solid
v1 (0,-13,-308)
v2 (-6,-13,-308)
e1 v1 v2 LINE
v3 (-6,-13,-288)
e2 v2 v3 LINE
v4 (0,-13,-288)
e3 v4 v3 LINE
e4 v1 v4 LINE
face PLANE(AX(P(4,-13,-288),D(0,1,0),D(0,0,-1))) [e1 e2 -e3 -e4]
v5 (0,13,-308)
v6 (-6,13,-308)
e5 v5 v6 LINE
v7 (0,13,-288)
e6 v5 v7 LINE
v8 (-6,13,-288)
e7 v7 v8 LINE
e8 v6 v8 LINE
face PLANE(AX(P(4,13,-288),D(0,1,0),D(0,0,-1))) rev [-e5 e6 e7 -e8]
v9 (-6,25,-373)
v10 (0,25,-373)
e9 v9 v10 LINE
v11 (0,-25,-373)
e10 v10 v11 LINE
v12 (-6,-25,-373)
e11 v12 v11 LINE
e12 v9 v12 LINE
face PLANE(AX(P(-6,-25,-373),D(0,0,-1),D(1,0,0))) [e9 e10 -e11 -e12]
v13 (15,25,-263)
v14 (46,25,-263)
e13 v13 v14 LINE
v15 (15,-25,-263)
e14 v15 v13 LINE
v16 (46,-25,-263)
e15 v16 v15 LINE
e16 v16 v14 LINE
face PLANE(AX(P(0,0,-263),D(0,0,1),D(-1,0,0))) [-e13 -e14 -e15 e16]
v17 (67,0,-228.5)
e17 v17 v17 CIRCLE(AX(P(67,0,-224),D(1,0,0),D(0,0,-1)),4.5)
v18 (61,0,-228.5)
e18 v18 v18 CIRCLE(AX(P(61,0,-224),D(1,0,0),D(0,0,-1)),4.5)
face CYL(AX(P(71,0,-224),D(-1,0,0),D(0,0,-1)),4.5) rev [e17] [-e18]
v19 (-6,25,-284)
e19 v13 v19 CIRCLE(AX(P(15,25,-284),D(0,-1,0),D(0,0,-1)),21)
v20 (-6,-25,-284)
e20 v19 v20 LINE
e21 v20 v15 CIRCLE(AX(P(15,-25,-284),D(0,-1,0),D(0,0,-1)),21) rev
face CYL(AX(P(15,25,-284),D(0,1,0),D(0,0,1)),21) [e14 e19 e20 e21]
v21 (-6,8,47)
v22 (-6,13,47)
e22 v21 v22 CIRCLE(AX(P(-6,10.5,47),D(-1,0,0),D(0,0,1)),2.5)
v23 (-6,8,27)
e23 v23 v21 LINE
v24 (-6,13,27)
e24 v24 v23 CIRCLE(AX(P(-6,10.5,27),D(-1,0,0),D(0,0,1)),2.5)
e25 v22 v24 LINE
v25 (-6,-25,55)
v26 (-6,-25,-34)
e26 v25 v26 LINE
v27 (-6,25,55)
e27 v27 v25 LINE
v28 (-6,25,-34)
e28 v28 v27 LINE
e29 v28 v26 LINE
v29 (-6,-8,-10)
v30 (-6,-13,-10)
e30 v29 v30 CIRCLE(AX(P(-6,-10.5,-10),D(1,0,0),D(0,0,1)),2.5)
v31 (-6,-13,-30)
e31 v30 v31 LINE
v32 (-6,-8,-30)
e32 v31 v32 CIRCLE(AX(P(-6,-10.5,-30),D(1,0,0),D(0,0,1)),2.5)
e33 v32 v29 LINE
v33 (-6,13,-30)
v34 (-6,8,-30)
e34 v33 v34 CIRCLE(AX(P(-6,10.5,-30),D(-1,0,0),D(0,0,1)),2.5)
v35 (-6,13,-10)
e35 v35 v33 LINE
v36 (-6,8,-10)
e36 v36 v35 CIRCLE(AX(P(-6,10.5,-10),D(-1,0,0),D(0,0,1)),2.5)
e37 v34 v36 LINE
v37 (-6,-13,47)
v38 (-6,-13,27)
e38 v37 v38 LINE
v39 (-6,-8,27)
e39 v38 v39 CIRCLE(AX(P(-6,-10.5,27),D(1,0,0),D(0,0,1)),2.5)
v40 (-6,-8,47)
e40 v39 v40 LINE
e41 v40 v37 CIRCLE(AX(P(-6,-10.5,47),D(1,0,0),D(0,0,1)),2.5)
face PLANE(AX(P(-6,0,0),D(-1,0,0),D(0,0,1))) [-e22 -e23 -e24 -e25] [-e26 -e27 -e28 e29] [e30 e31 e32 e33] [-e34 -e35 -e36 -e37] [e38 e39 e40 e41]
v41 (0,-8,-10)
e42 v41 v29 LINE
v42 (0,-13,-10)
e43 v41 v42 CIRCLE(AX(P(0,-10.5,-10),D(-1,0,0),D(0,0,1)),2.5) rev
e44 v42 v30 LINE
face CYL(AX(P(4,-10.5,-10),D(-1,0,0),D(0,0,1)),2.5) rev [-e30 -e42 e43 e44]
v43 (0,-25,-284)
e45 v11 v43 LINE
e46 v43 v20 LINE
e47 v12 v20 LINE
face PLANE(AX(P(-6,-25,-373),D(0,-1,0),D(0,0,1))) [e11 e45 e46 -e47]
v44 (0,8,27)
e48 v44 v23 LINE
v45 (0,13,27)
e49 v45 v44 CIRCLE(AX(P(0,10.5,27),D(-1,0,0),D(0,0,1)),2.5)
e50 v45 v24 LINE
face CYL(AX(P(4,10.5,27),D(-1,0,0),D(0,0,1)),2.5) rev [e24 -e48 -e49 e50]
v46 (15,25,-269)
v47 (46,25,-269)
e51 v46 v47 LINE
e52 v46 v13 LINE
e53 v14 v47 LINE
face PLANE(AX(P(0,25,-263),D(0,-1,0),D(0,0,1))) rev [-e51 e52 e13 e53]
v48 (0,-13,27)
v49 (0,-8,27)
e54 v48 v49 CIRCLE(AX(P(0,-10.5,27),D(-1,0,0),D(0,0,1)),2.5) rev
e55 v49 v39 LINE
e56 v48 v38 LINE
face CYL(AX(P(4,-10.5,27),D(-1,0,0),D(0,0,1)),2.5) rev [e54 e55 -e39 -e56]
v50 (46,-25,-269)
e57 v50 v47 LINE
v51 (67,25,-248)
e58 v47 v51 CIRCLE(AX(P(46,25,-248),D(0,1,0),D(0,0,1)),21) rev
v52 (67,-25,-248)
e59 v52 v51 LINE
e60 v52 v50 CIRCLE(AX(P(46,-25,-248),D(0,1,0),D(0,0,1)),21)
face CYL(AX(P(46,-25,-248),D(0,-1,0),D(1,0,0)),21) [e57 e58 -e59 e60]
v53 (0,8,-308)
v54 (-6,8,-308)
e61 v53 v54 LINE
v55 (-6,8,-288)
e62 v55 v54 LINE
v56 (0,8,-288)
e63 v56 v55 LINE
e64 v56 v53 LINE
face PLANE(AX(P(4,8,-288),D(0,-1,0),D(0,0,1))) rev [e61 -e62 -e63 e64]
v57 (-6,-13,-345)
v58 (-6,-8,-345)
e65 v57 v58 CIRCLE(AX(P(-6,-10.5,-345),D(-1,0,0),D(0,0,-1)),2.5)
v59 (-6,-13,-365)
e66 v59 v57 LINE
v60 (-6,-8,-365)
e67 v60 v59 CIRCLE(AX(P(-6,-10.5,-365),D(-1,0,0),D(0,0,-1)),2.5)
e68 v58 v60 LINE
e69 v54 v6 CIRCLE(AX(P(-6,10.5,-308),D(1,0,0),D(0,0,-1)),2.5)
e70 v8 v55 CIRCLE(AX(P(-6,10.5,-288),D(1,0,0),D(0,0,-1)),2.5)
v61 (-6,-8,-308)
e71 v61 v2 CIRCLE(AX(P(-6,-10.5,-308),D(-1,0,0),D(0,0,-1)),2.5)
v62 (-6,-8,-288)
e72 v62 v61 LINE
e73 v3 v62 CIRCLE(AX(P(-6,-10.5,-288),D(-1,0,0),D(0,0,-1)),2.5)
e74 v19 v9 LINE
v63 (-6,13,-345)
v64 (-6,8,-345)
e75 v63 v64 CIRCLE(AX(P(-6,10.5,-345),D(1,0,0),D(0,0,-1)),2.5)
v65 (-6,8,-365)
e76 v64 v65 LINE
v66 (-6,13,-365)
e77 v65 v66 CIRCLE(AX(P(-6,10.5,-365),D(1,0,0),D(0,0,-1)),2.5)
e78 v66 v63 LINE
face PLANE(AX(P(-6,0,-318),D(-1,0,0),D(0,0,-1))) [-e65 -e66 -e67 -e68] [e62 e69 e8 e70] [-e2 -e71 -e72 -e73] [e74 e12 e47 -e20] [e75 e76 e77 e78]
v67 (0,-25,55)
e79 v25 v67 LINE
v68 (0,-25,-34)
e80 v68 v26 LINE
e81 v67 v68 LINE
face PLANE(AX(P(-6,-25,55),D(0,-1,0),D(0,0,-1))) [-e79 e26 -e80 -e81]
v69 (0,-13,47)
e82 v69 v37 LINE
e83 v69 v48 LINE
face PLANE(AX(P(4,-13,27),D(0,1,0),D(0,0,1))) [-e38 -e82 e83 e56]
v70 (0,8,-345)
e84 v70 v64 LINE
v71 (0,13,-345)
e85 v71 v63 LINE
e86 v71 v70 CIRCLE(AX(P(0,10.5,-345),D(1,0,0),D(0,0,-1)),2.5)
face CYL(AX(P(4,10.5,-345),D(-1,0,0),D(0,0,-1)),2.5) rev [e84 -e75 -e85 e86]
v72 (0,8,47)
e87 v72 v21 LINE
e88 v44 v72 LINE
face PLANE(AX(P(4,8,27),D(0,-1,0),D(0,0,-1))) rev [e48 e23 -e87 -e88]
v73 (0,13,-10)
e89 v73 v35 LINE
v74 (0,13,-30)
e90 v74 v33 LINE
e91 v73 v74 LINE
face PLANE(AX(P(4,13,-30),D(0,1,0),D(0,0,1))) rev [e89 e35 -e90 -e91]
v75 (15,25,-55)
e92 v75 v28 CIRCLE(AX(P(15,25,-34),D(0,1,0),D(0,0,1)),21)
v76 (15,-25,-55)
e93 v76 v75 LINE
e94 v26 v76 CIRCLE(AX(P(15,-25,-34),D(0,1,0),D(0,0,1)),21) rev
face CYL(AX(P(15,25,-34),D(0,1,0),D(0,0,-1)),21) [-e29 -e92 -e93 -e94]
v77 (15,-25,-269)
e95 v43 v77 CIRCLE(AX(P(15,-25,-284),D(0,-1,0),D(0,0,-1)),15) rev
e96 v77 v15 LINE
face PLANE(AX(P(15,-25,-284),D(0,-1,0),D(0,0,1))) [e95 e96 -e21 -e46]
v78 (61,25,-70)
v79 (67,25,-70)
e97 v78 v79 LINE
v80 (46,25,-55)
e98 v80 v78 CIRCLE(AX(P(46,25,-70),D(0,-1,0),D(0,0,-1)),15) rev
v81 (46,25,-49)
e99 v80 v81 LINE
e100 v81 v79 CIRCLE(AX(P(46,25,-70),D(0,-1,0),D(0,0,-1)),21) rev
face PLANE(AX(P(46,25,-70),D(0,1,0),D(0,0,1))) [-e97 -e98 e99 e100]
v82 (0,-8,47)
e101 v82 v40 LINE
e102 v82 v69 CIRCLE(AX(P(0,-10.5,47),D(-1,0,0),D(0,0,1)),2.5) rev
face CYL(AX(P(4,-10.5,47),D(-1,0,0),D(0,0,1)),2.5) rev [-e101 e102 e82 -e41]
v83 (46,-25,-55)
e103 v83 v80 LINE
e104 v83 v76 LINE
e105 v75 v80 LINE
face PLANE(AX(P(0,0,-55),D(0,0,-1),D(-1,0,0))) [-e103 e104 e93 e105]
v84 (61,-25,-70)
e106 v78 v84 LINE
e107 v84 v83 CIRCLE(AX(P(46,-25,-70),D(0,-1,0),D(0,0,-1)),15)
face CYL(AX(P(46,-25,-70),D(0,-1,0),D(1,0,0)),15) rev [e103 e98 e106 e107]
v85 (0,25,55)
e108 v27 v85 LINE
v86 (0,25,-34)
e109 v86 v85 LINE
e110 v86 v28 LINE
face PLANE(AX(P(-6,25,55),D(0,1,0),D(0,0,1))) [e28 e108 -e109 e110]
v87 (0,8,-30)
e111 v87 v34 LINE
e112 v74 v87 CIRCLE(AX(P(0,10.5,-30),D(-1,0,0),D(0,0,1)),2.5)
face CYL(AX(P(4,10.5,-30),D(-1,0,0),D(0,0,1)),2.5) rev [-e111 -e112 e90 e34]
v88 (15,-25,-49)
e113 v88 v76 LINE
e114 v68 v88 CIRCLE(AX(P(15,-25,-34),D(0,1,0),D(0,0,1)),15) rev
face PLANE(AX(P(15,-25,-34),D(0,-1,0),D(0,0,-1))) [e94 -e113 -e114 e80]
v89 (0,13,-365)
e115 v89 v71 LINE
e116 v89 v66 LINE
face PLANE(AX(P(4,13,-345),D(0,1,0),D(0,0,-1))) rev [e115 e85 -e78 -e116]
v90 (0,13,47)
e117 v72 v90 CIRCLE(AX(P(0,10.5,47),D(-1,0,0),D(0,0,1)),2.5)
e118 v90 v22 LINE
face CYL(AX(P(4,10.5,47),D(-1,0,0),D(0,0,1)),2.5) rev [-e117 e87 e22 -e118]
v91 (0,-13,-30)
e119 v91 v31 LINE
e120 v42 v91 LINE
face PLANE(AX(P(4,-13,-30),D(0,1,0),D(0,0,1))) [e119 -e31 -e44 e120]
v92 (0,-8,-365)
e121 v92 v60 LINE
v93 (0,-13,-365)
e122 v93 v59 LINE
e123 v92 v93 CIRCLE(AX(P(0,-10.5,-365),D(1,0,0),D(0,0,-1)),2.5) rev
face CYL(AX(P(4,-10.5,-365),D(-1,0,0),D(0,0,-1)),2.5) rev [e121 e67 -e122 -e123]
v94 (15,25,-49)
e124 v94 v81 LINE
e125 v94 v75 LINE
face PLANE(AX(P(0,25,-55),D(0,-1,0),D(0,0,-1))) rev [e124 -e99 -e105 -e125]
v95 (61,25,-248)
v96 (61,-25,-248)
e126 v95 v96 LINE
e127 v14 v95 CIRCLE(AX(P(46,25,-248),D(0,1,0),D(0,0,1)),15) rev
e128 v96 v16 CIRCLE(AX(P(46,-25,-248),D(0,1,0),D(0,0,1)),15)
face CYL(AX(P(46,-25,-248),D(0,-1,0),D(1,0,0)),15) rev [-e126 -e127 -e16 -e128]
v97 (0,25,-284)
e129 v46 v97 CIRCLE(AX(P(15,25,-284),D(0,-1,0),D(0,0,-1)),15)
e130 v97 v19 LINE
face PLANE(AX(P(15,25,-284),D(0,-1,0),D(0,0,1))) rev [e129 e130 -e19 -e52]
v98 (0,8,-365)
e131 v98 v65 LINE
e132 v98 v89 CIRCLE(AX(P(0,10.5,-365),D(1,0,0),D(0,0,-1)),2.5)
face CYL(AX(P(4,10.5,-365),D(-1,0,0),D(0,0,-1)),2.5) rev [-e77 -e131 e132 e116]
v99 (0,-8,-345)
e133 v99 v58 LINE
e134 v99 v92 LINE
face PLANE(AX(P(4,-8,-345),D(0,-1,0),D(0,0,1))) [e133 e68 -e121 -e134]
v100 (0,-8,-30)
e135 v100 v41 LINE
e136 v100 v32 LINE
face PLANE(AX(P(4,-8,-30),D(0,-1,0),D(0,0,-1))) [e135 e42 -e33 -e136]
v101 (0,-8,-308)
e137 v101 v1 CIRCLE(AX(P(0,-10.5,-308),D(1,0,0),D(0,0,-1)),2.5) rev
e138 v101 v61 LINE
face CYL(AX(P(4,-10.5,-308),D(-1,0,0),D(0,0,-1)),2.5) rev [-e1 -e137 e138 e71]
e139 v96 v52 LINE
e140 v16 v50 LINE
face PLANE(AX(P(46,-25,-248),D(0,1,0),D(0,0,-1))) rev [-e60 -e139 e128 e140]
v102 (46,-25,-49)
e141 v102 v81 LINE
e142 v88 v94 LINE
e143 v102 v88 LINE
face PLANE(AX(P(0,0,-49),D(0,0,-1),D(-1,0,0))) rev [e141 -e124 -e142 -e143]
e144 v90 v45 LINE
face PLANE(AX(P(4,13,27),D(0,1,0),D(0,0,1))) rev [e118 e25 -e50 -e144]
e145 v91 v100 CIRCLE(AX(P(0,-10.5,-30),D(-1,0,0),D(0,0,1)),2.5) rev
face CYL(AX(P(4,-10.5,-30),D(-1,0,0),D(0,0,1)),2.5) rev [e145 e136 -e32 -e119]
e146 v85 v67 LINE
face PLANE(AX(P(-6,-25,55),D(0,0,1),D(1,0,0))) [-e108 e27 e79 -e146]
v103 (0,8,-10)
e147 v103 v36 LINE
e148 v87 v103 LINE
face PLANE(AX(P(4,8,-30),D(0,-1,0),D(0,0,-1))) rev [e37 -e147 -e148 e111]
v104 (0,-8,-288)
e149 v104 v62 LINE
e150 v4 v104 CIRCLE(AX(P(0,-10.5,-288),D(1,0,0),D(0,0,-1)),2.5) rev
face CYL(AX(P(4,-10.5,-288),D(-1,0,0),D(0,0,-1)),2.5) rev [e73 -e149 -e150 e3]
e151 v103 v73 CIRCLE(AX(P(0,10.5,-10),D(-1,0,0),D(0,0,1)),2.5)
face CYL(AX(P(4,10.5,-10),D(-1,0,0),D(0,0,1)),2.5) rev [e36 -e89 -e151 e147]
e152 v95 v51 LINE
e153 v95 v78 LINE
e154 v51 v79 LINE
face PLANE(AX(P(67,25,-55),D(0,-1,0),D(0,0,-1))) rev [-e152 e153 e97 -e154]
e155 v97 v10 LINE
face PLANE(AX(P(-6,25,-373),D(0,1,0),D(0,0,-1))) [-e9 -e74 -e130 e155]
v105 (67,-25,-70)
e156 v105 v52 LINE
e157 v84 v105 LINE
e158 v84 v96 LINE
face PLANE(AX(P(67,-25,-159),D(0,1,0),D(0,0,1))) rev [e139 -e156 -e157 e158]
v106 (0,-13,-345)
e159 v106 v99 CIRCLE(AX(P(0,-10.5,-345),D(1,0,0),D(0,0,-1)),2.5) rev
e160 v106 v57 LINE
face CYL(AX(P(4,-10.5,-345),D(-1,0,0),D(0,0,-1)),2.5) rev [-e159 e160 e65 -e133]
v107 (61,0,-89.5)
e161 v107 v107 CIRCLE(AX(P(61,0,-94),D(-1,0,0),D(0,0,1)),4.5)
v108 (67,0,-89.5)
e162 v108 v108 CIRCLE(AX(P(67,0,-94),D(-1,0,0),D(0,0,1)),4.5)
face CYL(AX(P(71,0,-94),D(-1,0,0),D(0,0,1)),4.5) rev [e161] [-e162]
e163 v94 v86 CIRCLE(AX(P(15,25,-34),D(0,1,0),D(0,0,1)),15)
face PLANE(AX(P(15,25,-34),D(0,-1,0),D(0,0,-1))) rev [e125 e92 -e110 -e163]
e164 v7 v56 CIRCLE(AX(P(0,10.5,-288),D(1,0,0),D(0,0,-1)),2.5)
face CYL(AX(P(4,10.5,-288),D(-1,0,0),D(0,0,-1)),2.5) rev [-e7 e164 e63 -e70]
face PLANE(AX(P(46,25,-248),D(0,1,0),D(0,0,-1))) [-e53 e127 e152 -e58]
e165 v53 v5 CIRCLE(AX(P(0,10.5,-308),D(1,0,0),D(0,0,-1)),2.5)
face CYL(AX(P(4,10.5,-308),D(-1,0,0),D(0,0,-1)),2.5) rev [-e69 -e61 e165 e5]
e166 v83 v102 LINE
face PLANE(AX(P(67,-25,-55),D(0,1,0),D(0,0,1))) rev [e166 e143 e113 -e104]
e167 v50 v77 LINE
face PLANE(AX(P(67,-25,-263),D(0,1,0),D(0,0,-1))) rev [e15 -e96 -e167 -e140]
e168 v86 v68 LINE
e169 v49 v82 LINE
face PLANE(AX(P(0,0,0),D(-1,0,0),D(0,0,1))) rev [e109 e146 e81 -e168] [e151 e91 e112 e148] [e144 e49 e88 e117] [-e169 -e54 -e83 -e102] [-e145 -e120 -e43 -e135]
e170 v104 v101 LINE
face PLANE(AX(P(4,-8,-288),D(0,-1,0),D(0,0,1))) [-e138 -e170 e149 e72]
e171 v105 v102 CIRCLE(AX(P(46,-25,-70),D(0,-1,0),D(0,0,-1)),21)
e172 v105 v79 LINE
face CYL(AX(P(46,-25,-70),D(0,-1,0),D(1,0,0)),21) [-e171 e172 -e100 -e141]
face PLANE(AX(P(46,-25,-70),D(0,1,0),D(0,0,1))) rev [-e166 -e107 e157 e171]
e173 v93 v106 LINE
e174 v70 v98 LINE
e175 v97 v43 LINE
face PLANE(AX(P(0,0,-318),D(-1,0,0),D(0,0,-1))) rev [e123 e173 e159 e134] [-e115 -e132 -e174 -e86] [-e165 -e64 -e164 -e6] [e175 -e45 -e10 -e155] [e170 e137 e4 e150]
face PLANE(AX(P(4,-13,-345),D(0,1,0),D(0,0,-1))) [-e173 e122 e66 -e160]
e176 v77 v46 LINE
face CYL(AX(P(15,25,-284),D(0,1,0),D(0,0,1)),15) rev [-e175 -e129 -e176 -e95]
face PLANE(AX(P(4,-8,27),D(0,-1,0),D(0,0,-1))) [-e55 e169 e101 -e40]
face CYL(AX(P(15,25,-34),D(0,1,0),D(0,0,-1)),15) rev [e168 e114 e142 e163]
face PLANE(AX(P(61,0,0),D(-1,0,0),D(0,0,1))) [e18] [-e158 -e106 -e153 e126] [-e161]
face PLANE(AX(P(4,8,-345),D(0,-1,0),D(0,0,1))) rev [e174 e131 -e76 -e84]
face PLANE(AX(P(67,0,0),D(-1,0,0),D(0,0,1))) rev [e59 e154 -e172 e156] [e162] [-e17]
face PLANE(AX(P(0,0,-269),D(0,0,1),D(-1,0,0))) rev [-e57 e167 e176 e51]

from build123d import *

# Parameters (mm, degrees)
SKETCH1_W                    = 110
SKETCH1_H                    = 50
BASE_FLANGE1_DEPTH           = 6
CUT_EXTRUDE1_DEPTH           = 10
LPATTERN1_COUNT              = 2
LPATTERN1_PITCH              = 57
MIRROR1_COPY_1_DEPTH         = 10
EDGE_FLANGE1_STRIP_W         = 54
EDGE_FLANGE1_STRIP_H         = 6
EDGE_FLANGE1_STRIP_CUT_DEPTH = 50
EDGE_FLANGE1_DEPTH           = 50
EDGE_FLANGE2_STRIP_W         = 54
EDGE_FLANGE2_STRIP_H         = 6
EDGE_FLANGE2_STRIP_CUT_DEPTH = 50
EDGE_FLANGE2_DEPTH           = 50
SKETCH9_R                    = 4.5
CUT_EXTRUDE2_DEPTH           = 10


# Sheet-metal steps are written as plain solids
with BuildPart() as part:
    # Sketch1 → Base-Flange1 (new body)
    with BuildSketch(Plane(origin=(0, 0, 0), x_dir=(0, 0, -1), z_dir=(1, 0, 0))):
        Rectangle(SKETCH1_W, SKETCH1_H)
    extrude(amount=-BASE_FLANGE1_DEPTH)

    # Sketch5 → Cut-Extrude1 (cut)
    with BuildSketch(Plane.ZY.offset(6)):
        with BuildLine():
            Line((-30, 13), (-10, 13))
            ThreePointArc((-10, 13), (-7.5, 10.5), (-10, 8))
            Line((-10, 8), (-30, 8))
            ThreePointArc((-30, 8), (-32.5, 10.5), (-30, 13))
        make_face()
    cut_extrude1 = extrude(amount=-CUT_EXTRUDE1_DEPTH, mode=Mode.SUBTRACT)

    # LPattern1: Cut-Extrude1 ×2
    with Locations(*[(0, 0, i * LPATTERN1_PITCH) for i in range(1, LPATTERN1_COUNT)]):
        add(cut_extrude1, mode=Mode.SUBTRACT)

    # Mirror1: Cut-Extrude1 across plane
    add(cut_extrude1.mirror(Plane.ZX), mode=Mode.SUBTRACT)

    # Mirror1 copy 1 sketch → Mirror1 copy 1 (cut)
    with BuildSketch(Plane(origin=(-6, 0, 57), x_dir=(0, 0, 1), z_dir=(-1, 0, 0))):
        with BuildLine():
            Line((-30, -13), (-10, -13))
            ThreePointArc((-10, -13), (-7.5, -10.5), (-10, -8))
            Line((-10, -8), (-30, -8))
            ThreePointArc((-30, -8), (-32.5, -10.5), (-30, -13))
        make_face()
    extrude(amount=-MIRROR1_COPY_1_DEPTH, mode=Mode.SUBTRACT)

    # Edge-Flange1 strip (across the edge) → Edge-Flange1 strip cut (cut)
    with BuildSketch(Plane(origin=(0, -25, -55), x_dir=(0, 0, 1), z_dir=(0, 1, 0))):
        with Locations((-6, -3)):
            Rectangle(EDGE_FLANGE1_STRIP_W, EDGE_FLANGE1_STRIP_H)
    extrude(amount=EDGE_FLANGE1_STRIP_CUT_DEPTH, mode=Mode.SUBTRACT)

    # Edge-Flange1 section (across the edge) → Edge-Flange1 (add)
    with BuildSketch(Plane(origin=(0, -25, -55), x_dir=(0, 0, 1), z_dir=(0, 1, 0))):
        with BuildLine():
            Line((0, 15), (0, 67))
            Line((0, 67), (6, 67))
            Line((6, 67), (6, 15))
            ThreePointArc((6, 15), (10.393398282, 4.393398282), (21, 0))
            Line((21, 0), (21, -6))
            ThreePointArc((21, -6), (6.150757595, 0.150757595), (0, 15))
        make_face()
    extrude(amount=EDGE_FLANGE1_DEPTH)

    # Edge-Flange2 strip (across the edge) → Edge-Flange2 strip cut (cut)
    with BuildSketch(Plane(origin=(67, 25, -55), x_dir=(-1, 0, 0), z_dir=(0, -1, 0))):
        with Locations((-6, -3)):
            Rectangle(EDGE_FLANGE2_STRIP_W, EDGE_FLANGE2_STRIP_H)
    extrude(amount=EDGE_FLANGE2_STRIP_CUT_DEPTH, mode=Mode.SUBTRACT)

    # Edge-Flange2 section (across the edge) → Edge-Flange2 (add)
    with BuildSketch(Plane(origin=(67, 25, -55), x_dir=(-1, 0, 0), z_dir=(0, -1, 0))):
        with BuildLine():
            Line((0, 15), (0, 104))
            Line((0, 104), (6, 104))
            Line((6, 104), (6, 15))
            ThreePointArc((6, 15), (10.393398282, 4.393398282), (21, 0))
            Line((21, 0), (21, -6))
            ThreePointArc((21, -6), (6.150757595, 0.150757595), (0, 15))
        make_face()
    extrude(amount=EDGE_FLANGE2_DEPTH)

    # Sketch9 → Cut-Extrude2 (cut)
    with BuildSketch(Plane.ZY.offset(-61)):
        with Locations((-94, 0)):
            Circle(SKETCH9_R)
    extrude(amount=-CUT_EXTRUDE2_DEPTH, mode=Mode.SUBTRACT)

    # Mirror2: part across plane


with BuildPart() as part_1:
    add(part.part)
    add(part.part.mirror(Plane(origin=(67, 25, -159), x_dir=(1, 0, 0), z_dir=(0, 0, 1))))


solid = part_1.part
